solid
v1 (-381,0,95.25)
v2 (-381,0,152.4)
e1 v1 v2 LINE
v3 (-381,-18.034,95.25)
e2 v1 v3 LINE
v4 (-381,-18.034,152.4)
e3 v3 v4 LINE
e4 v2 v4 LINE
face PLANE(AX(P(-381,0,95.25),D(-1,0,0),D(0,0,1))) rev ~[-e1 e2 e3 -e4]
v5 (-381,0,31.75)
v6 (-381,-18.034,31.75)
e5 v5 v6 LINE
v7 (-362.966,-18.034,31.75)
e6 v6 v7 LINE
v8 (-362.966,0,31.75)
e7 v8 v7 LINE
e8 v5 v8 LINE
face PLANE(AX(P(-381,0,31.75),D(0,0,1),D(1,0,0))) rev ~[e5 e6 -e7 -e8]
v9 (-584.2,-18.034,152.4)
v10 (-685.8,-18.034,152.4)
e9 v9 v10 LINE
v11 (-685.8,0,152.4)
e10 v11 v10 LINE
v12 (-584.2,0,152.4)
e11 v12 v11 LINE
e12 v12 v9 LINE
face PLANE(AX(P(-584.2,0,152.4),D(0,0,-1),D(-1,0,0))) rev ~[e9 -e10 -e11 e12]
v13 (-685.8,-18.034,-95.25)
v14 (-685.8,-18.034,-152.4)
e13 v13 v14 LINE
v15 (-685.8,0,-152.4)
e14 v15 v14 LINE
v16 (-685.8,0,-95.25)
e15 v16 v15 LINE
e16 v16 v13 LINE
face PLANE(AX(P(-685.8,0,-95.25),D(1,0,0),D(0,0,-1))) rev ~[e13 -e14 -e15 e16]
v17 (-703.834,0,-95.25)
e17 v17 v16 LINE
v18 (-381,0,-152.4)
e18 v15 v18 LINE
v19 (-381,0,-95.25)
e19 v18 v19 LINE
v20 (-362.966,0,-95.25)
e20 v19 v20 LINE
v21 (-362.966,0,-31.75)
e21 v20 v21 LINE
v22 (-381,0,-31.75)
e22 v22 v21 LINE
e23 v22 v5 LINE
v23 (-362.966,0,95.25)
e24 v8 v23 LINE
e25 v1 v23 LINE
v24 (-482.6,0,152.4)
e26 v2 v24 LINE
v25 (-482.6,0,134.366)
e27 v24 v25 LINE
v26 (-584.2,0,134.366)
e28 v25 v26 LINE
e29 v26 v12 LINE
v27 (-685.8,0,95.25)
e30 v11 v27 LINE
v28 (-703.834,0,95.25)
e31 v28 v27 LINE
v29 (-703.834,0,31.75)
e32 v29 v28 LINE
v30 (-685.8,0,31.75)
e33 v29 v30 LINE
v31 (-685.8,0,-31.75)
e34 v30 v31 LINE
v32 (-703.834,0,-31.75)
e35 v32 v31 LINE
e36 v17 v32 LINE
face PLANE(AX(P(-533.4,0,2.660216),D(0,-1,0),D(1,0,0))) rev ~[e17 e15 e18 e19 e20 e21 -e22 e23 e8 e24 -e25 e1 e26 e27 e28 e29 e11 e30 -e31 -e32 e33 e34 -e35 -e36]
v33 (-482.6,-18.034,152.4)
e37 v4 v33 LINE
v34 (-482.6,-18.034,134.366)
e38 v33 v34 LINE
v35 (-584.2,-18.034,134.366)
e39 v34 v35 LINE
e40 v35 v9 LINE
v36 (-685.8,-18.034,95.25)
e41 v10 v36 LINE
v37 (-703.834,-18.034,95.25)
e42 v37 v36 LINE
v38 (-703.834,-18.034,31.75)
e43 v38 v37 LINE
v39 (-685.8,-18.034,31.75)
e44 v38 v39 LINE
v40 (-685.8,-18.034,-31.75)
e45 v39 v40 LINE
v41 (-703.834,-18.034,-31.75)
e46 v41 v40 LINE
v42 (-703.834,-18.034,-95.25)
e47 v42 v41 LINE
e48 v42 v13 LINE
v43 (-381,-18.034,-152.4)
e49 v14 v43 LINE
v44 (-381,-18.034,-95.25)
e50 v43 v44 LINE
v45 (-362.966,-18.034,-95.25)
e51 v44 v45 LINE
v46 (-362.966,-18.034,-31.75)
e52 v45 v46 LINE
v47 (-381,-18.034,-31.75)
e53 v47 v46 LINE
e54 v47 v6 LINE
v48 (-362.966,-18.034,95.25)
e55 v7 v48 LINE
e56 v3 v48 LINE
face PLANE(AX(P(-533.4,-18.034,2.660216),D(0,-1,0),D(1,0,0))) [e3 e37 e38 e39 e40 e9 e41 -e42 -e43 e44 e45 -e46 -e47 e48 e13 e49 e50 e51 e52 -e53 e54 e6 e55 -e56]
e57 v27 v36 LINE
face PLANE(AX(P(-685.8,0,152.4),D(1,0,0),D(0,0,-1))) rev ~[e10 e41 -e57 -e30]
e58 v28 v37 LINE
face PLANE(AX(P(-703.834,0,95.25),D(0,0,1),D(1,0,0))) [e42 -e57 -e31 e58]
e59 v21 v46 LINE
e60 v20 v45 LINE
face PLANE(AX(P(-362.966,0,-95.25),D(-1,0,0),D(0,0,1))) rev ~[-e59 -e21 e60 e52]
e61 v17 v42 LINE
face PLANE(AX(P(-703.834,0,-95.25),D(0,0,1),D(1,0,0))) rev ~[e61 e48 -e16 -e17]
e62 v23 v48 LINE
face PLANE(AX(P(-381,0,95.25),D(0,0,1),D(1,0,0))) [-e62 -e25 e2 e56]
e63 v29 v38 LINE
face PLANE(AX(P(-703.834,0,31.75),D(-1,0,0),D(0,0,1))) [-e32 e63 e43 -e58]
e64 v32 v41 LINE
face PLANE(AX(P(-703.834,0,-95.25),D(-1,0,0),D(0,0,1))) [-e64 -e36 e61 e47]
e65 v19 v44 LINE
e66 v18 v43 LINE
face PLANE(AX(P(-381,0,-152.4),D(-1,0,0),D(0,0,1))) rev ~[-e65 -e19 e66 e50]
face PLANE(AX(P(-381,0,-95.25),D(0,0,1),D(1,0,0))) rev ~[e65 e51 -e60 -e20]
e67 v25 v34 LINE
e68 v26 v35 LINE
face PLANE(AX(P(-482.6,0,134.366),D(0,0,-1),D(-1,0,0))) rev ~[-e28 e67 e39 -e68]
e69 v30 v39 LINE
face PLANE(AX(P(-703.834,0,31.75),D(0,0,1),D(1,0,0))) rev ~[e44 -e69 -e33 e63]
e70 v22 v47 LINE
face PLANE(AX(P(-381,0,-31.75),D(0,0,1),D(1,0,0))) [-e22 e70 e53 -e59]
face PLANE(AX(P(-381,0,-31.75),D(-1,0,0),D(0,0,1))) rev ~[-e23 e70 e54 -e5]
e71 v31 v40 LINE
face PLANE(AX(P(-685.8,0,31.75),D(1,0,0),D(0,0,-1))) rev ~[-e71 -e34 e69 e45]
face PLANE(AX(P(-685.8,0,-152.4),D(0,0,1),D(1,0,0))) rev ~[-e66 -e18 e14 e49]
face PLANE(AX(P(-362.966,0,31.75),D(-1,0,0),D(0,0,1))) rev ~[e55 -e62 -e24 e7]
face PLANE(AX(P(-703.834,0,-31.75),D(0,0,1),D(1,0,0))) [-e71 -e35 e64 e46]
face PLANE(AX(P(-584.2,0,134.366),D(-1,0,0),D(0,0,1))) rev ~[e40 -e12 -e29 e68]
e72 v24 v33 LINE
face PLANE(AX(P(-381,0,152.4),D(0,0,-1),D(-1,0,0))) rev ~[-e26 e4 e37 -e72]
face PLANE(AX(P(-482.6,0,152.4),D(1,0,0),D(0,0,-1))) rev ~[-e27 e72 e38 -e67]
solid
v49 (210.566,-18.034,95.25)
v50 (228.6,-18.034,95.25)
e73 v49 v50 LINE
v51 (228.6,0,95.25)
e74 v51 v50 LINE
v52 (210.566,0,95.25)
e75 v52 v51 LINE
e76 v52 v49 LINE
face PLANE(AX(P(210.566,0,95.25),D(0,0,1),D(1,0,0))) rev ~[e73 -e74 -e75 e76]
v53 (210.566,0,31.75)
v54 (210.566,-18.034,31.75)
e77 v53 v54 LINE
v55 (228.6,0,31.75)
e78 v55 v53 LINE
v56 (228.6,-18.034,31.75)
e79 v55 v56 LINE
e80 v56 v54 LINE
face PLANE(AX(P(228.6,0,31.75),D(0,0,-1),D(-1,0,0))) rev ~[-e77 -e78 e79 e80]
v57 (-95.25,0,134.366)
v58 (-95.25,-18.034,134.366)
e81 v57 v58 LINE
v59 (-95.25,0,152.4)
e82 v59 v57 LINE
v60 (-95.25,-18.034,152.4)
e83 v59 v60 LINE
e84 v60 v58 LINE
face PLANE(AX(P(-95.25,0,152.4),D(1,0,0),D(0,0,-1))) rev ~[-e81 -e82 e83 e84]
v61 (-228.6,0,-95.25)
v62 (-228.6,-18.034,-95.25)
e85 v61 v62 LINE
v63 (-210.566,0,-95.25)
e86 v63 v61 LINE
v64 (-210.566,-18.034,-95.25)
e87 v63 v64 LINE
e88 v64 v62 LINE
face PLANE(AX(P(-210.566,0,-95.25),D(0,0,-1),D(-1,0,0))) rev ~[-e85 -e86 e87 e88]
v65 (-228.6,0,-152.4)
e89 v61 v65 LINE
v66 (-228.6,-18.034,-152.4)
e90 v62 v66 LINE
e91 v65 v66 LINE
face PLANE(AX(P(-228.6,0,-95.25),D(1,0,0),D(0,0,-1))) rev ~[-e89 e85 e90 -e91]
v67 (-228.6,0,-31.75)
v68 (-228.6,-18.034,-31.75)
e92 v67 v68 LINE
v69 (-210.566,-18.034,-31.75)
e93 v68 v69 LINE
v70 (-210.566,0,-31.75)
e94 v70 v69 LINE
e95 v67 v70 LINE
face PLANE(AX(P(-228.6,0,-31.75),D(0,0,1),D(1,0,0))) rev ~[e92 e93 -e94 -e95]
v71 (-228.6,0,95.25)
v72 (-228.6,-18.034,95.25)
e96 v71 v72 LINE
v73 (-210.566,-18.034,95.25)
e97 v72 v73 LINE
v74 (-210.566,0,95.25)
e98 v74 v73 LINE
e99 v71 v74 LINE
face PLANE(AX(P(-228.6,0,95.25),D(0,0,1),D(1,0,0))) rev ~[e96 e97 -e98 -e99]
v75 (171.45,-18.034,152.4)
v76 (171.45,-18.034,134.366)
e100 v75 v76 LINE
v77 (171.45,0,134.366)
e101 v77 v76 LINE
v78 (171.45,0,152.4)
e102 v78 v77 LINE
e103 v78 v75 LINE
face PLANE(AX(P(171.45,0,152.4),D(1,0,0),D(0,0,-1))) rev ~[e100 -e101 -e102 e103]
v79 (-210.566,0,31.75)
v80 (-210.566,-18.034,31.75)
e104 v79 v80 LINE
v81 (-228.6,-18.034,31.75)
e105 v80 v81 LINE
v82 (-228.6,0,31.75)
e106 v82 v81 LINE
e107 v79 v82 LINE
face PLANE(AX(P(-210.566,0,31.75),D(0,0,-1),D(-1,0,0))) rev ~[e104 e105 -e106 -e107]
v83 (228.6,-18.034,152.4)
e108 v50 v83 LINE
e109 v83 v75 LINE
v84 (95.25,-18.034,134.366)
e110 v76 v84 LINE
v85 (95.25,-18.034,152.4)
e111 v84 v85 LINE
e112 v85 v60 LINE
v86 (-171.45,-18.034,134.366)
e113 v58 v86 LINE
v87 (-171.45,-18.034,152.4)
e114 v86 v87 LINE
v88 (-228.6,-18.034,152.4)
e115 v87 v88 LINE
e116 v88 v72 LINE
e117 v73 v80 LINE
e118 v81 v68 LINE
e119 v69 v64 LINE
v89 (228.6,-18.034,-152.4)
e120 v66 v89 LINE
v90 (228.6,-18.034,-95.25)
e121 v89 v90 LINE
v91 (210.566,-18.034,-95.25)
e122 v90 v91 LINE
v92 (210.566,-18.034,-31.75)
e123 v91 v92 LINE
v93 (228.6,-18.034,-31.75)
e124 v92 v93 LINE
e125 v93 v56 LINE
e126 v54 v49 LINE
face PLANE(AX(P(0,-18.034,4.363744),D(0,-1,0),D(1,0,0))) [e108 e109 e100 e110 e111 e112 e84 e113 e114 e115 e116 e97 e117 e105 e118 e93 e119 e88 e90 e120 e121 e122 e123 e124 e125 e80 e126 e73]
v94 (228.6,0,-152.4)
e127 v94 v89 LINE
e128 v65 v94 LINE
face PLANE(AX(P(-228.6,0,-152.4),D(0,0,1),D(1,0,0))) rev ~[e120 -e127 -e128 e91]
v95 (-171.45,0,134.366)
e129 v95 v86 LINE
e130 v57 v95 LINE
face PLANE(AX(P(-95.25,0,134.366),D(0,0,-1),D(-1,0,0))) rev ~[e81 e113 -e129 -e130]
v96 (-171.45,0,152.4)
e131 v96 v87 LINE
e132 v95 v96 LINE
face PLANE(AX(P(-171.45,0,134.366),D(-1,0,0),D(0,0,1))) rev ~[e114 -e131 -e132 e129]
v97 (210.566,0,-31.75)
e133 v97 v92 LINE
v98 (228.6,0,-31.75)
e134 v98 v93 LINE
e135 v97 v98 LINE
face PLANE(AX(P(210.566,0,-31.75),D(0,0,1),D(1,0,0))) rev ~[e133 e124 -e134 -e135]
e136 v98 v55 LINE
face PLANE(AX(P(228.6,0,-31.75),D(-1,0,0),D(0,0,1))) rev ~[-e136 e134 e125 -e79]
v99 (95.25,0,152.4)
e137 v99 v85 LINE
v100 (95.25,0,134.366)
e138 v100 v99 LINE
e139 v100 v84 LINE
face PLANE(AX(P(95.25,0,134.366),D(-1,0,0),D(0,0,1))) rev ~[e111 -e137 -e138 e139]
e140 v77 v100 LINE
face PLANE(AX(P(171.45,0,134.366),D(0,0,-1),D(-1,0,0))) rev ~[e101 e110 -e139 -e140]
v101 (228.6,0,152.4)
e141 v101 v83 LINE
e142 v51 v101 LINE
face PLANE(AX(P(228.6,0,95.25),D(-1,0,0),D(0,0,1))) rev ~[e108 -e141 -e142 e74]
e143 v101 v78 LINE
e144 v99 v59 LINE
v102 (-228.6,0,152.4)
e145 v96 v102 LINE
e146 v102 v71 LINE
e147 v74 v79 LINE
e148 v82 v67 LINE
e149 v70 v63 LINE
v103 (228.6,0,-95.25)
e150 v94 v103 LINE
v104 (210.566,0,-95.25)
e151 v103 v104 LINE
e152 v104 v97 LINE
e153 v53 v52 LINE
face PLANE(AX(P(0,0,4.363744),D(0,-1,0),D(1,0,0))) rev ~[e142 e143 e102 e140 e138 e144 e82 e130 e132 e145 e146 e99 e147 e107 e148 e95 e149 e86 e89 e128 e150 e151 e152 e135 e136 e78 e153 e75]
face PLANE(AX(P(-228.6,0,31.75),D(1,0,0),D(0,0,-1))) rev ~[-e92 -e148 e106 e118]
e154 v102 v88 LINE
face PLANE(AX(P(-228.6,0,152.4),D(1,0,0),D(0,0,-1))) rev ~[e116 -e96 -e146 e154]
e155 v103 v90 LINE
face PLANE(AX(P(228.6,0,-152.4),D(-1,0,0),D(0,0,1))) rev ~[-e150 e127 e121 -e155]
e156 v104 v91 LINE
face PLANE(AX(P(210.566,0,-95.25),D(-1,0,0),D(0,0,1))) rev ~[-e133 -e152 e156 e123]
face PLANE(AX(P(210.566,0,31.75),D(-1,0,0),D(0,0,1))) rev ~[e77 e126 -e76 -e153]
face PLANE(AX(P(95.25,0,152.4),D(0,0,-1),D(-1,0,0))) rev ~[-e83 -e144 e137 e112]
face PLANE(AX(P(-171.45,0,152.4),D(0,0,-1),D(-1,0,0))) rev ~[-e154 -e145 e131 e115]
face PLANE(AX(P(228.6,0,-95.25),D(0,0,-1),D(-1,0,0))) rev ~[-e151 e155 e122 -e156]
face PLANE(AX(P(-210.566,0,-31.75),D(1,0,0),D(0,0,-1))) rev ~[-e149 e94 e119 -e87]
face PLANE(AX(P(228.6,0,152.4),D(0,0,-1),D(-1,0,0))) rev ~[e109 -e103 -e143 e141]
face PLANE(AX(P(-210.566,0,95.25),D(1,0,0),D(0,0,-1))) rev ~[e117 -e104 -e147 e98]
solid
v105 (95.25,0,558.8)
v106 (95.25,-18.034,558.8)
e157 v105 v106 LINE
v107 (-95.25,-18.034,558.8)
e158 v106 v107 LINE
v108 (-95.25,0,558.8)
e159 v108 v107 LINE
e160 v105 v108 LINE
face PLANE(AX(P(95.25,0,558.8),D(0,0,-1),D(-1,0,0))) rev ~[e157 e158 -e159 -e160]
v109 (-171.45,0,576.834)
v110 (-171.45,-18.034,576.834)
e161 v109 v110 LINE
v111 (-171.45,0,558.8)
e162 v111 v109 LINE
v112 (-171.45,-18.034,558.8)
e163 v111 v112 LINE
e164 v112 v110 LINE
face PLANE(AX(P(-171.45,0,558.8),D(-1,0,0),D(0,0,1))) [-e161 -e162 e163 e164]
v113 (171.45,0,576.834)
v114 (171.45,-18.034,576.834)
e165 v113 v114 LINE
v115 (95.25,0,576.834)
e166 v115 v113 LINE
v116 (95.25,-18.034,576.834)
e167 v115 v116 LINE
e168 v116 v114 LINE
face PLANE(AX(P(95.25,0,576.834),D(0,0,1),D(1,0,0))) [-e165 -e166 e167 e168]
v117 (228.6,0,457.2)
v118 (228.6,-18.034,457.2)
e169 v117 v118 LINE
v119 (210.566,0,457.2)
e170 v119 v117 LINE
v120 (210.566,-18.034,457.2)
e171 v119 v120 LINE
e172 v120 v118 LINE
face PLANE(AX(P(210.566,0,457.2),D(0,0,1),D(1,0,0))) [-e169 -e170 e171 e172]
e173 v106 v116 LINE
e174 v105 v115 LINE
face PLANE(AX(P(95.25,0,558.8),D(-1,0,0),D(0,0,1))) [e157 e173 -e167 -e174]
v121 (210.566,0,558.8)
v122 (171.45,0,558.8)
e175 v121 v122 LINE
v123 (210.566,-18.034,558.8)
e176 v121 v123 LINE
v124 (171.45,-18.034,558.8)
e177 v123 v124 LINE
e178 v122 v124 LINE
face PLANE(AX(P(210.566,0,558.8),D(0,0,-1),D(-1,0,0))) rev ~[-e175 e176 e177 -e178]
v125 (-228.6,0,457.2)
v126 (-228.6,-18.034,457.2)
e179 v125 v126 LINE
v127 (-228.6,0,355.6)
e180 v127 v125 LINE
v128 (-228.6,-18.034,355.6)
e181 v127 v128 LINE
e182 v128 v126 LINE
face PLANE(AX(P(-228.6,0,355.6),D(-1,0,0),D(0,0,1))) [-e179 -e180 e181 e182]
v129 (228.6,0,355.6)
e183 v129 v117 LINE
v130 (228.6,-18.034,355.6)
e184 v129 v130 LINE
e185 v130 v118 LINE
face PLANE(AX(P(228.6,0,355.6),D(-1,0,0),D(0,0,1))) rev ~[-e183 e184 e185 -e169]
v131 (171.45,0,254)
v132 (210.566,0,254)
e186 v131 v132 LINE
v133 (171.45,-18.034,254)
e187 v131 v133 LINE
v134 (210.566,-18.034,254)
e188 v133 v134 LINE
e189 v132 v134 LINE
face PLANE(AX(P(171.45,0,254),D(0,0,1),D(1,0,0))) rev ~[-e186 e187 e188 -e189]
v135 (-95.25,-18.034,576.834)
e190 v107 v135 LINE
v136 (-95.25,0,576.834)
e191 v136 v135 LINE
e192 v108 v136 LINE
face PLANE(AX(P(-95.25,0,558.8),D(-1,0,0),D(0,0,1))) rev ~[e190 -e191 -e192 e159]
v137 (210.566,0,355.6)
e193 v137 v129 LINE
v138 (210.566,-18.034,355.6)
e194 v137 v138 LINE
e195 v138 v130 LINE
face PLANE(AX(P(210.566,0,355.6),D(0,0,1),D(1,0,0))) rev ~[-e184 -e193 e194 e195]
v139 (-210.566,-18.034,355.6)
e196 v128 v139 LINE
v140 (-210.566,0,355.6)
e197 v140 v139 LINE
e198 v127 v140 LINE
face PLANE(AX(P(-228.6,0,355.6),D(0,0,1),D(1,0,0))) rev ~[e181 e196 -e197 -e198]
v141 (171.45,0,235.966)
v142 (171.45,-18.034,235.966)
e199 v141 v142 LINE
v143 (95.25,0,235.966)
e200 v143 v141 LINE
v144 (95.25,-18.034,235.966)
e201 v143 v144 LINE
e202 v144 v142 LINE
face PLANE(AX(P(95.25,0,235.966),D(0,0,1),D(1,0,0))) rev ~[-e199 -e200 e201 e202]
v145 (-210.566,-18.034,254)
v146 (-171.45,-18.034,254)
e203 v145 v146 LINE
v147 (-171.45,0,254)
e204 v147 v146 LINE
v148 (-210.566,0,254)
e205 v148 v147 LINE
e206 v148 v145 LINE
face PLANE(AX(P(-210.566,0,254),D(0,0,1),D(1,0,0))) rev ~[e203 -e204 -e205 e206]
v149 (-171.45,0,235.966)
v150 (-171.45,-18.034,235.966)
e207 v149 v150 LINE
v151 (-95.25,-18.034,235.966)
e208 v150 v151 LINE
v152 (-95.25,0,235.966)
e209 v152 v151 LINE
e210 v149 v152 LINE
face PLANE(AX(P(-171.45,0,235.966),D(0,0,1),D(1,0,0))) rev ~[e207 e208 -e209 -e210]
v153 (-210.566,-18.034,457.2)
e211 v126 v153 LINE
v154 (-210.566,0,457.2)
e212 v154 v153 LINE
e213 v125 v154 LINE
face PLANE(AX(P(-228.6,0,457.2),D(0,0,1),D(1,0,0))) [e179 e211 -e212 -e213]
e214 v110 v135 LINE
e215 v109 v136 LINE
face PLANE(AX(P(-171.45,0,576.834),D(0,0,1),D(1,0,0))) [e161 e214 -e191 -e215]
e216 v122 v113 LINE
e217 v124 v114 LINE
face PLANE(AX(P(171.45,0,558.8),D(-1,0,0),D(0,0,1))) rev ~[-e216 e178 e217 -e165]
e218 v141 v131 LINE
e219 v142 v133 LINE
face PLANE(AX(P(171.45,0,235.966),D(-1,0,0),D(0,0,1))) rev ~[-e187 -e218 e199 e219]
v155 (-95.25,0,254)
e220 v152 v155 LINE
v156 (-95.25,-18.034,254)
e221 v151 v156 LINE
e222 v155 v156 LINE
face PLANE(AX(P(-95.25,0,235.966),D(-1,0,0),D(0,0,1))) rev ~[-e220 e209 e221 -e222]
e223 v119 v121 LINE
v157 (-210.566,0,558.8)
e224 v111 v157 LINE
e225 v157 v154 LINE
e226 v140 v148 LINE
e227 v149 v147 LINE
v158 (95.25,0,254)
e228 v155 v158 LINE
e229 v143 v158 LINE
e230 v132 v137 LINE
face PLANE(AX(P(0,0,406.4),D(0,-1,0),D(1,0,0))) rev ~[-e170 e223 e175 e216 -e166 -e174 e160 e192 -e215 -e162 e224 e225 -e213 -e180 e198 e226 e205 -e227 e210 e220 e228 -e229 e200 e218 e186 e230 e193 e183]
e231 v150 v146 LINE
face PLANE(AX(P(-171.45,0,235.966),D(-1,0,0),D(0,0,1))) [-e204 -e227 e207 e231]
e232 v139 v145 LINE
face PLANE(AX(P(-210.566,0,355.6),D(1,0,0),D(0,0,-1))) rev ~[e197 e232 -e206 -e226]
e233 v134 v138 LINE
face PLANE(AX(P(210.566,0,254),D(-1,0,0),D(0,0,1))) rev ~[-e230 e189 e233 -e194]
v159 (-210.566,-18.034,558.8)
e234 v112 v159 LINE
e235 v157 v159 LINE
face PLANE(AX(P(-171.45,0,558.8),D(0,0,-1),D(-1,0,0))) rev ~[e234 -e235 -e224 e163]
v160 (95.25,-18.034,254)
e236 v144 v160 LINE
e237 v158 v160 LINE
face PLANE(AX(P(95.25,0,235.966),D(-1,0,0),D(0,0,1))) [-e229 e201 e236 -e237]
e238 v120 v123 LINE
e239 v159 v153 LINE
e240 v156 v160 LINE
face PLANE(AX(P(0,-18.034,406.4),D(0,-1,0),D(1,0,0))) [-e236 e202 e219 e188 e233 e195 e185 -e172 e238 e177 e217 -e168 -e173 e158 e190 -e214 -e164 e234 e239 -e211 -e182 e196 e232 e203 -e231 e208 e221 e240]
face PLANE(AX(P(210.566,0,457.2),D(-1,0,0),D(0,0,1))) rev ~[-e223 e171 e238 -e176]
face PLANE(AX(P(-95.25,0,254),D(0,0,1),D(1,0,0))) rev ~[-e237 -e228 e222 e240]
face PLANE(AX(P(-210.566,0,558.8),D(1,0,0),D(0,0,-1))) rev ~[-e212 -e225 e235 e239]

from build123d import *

# Parameters (mm, degrees)
F1_W     = 18.034
F1_H     = 63.5
F2_DEPTH = 18.034
F1_W_2   = 76.2
F1_H_2   = 18.034
F1_H_3   = 101.6


# Not quite as in the source:
# - a variable given as a bare number and used for a length is read in inches; the dataset says mm whatever the document's units were


with BuildPart() as f2:
    # F1 (on Front) → F2 (new body)
    with BuildSketch(Plane.XZ):
        Polygon((-381, 95.25), (-381, 152.4), (-482.6, 152.4), (-482.6, 134.366), (-584.2, 134.366), (-584.2, 152.4), (-685.8, 152.4), (-685.8, 95.25), (-685.8, 31.75), (-685.8, -31.75), (-685.8, -95.25), (-685.8, -152.4), (-381, -152.4), (-381, -95.25), (-381, -31.75), (-381, 31.75), align=None)
        with Locations((-694.817, 63.5)):
            Rectangle(F1_W, F1_H)
        with Locations((-694.817, -63.5)):
            Rectangle(F1_W, F1_H)
        with Locations((-371.983, 63.5)):
            Rectangle(F1_W, F1_H)
        with Locations((-371.983, -63.5)):
            Rectangle(F1_W, F1_H)
    extrude(amount=F2_DEPTH)


with BuildPart() as f2b:
    # F1 (on Front) → F2, piece 2 (new body)
    with BuildSketch(Plane.XZ):
        Polygon((-171.45, 152.4), (-228.6, 152.4), (-228.6, 95.25), (-210.566, 95.25), (-210.566, 31.75), (-228.6, 31.75), (-228.6, -31.75), (-210.566, -31.75), (-210.566, -95.25), (-228.6, -95.25), (-228.6, -152.4), (228.6, -152.4), (228.6, -95.25), (210.566, -95.25), (210.566, -31.75), (228.6, -31.75), (228.6, 31.75), (210.566, 31.75), (210.566, 95.25), (228.6, 95.25), (228.6, 152.4), (171.45, 152.4), (171.45, 134.366), (95.25, 134.366), (95.25, 152.4), (-95.25, 152.4), (-95.25, 134.366), (-171.45, 134.366), align=None)
    extrude(amount=F2_DEPTH)


with BuildPart() as f2c:
    # F1 (on Front) → F2, piece 3 (new body)
    with BuildSketch(Plane.XZ):
        Polygon((-210.566, 254), (-171.45, 254), (-95.25, 254), (95.25, 254), (171.45, 254), (210.566, 254), (210.566, 355.6), (210.566, 457.2), (210.566, 558.8), (171.45, 558.8), (95.25, 558.8), (-95.25, 558.8), (-171.45, 558.8), (-210.566, 558.8), (-210.566, 457.2), (-210.566, 355.6), align=None)
        with Locations((-133.35, 567.817)):
            Rectangle(F1_W_2, F1_H_2)
        with Locations((133.35, 567.817)):
            Rectangle(F1_W_2, F1_H_2)
        with Locations((133.35, 244.983)):
            Rectangle(F1_W_2, F1_H_2)
        with Locations((-133.35, 244.983)):
            Rectangle(F1_W_2, F1_H_2)
        with Locations((-219.583, 406.4)):
            Rectangle(F1_W, F1_H_3)
        with Locations((219.583, 406.4)):
            Rectangle(F1_W, F1_H_3)
    extrude(amount=F2_DEPTH)


solid = Compound([f2.part, f2b.part, f2c.part])
